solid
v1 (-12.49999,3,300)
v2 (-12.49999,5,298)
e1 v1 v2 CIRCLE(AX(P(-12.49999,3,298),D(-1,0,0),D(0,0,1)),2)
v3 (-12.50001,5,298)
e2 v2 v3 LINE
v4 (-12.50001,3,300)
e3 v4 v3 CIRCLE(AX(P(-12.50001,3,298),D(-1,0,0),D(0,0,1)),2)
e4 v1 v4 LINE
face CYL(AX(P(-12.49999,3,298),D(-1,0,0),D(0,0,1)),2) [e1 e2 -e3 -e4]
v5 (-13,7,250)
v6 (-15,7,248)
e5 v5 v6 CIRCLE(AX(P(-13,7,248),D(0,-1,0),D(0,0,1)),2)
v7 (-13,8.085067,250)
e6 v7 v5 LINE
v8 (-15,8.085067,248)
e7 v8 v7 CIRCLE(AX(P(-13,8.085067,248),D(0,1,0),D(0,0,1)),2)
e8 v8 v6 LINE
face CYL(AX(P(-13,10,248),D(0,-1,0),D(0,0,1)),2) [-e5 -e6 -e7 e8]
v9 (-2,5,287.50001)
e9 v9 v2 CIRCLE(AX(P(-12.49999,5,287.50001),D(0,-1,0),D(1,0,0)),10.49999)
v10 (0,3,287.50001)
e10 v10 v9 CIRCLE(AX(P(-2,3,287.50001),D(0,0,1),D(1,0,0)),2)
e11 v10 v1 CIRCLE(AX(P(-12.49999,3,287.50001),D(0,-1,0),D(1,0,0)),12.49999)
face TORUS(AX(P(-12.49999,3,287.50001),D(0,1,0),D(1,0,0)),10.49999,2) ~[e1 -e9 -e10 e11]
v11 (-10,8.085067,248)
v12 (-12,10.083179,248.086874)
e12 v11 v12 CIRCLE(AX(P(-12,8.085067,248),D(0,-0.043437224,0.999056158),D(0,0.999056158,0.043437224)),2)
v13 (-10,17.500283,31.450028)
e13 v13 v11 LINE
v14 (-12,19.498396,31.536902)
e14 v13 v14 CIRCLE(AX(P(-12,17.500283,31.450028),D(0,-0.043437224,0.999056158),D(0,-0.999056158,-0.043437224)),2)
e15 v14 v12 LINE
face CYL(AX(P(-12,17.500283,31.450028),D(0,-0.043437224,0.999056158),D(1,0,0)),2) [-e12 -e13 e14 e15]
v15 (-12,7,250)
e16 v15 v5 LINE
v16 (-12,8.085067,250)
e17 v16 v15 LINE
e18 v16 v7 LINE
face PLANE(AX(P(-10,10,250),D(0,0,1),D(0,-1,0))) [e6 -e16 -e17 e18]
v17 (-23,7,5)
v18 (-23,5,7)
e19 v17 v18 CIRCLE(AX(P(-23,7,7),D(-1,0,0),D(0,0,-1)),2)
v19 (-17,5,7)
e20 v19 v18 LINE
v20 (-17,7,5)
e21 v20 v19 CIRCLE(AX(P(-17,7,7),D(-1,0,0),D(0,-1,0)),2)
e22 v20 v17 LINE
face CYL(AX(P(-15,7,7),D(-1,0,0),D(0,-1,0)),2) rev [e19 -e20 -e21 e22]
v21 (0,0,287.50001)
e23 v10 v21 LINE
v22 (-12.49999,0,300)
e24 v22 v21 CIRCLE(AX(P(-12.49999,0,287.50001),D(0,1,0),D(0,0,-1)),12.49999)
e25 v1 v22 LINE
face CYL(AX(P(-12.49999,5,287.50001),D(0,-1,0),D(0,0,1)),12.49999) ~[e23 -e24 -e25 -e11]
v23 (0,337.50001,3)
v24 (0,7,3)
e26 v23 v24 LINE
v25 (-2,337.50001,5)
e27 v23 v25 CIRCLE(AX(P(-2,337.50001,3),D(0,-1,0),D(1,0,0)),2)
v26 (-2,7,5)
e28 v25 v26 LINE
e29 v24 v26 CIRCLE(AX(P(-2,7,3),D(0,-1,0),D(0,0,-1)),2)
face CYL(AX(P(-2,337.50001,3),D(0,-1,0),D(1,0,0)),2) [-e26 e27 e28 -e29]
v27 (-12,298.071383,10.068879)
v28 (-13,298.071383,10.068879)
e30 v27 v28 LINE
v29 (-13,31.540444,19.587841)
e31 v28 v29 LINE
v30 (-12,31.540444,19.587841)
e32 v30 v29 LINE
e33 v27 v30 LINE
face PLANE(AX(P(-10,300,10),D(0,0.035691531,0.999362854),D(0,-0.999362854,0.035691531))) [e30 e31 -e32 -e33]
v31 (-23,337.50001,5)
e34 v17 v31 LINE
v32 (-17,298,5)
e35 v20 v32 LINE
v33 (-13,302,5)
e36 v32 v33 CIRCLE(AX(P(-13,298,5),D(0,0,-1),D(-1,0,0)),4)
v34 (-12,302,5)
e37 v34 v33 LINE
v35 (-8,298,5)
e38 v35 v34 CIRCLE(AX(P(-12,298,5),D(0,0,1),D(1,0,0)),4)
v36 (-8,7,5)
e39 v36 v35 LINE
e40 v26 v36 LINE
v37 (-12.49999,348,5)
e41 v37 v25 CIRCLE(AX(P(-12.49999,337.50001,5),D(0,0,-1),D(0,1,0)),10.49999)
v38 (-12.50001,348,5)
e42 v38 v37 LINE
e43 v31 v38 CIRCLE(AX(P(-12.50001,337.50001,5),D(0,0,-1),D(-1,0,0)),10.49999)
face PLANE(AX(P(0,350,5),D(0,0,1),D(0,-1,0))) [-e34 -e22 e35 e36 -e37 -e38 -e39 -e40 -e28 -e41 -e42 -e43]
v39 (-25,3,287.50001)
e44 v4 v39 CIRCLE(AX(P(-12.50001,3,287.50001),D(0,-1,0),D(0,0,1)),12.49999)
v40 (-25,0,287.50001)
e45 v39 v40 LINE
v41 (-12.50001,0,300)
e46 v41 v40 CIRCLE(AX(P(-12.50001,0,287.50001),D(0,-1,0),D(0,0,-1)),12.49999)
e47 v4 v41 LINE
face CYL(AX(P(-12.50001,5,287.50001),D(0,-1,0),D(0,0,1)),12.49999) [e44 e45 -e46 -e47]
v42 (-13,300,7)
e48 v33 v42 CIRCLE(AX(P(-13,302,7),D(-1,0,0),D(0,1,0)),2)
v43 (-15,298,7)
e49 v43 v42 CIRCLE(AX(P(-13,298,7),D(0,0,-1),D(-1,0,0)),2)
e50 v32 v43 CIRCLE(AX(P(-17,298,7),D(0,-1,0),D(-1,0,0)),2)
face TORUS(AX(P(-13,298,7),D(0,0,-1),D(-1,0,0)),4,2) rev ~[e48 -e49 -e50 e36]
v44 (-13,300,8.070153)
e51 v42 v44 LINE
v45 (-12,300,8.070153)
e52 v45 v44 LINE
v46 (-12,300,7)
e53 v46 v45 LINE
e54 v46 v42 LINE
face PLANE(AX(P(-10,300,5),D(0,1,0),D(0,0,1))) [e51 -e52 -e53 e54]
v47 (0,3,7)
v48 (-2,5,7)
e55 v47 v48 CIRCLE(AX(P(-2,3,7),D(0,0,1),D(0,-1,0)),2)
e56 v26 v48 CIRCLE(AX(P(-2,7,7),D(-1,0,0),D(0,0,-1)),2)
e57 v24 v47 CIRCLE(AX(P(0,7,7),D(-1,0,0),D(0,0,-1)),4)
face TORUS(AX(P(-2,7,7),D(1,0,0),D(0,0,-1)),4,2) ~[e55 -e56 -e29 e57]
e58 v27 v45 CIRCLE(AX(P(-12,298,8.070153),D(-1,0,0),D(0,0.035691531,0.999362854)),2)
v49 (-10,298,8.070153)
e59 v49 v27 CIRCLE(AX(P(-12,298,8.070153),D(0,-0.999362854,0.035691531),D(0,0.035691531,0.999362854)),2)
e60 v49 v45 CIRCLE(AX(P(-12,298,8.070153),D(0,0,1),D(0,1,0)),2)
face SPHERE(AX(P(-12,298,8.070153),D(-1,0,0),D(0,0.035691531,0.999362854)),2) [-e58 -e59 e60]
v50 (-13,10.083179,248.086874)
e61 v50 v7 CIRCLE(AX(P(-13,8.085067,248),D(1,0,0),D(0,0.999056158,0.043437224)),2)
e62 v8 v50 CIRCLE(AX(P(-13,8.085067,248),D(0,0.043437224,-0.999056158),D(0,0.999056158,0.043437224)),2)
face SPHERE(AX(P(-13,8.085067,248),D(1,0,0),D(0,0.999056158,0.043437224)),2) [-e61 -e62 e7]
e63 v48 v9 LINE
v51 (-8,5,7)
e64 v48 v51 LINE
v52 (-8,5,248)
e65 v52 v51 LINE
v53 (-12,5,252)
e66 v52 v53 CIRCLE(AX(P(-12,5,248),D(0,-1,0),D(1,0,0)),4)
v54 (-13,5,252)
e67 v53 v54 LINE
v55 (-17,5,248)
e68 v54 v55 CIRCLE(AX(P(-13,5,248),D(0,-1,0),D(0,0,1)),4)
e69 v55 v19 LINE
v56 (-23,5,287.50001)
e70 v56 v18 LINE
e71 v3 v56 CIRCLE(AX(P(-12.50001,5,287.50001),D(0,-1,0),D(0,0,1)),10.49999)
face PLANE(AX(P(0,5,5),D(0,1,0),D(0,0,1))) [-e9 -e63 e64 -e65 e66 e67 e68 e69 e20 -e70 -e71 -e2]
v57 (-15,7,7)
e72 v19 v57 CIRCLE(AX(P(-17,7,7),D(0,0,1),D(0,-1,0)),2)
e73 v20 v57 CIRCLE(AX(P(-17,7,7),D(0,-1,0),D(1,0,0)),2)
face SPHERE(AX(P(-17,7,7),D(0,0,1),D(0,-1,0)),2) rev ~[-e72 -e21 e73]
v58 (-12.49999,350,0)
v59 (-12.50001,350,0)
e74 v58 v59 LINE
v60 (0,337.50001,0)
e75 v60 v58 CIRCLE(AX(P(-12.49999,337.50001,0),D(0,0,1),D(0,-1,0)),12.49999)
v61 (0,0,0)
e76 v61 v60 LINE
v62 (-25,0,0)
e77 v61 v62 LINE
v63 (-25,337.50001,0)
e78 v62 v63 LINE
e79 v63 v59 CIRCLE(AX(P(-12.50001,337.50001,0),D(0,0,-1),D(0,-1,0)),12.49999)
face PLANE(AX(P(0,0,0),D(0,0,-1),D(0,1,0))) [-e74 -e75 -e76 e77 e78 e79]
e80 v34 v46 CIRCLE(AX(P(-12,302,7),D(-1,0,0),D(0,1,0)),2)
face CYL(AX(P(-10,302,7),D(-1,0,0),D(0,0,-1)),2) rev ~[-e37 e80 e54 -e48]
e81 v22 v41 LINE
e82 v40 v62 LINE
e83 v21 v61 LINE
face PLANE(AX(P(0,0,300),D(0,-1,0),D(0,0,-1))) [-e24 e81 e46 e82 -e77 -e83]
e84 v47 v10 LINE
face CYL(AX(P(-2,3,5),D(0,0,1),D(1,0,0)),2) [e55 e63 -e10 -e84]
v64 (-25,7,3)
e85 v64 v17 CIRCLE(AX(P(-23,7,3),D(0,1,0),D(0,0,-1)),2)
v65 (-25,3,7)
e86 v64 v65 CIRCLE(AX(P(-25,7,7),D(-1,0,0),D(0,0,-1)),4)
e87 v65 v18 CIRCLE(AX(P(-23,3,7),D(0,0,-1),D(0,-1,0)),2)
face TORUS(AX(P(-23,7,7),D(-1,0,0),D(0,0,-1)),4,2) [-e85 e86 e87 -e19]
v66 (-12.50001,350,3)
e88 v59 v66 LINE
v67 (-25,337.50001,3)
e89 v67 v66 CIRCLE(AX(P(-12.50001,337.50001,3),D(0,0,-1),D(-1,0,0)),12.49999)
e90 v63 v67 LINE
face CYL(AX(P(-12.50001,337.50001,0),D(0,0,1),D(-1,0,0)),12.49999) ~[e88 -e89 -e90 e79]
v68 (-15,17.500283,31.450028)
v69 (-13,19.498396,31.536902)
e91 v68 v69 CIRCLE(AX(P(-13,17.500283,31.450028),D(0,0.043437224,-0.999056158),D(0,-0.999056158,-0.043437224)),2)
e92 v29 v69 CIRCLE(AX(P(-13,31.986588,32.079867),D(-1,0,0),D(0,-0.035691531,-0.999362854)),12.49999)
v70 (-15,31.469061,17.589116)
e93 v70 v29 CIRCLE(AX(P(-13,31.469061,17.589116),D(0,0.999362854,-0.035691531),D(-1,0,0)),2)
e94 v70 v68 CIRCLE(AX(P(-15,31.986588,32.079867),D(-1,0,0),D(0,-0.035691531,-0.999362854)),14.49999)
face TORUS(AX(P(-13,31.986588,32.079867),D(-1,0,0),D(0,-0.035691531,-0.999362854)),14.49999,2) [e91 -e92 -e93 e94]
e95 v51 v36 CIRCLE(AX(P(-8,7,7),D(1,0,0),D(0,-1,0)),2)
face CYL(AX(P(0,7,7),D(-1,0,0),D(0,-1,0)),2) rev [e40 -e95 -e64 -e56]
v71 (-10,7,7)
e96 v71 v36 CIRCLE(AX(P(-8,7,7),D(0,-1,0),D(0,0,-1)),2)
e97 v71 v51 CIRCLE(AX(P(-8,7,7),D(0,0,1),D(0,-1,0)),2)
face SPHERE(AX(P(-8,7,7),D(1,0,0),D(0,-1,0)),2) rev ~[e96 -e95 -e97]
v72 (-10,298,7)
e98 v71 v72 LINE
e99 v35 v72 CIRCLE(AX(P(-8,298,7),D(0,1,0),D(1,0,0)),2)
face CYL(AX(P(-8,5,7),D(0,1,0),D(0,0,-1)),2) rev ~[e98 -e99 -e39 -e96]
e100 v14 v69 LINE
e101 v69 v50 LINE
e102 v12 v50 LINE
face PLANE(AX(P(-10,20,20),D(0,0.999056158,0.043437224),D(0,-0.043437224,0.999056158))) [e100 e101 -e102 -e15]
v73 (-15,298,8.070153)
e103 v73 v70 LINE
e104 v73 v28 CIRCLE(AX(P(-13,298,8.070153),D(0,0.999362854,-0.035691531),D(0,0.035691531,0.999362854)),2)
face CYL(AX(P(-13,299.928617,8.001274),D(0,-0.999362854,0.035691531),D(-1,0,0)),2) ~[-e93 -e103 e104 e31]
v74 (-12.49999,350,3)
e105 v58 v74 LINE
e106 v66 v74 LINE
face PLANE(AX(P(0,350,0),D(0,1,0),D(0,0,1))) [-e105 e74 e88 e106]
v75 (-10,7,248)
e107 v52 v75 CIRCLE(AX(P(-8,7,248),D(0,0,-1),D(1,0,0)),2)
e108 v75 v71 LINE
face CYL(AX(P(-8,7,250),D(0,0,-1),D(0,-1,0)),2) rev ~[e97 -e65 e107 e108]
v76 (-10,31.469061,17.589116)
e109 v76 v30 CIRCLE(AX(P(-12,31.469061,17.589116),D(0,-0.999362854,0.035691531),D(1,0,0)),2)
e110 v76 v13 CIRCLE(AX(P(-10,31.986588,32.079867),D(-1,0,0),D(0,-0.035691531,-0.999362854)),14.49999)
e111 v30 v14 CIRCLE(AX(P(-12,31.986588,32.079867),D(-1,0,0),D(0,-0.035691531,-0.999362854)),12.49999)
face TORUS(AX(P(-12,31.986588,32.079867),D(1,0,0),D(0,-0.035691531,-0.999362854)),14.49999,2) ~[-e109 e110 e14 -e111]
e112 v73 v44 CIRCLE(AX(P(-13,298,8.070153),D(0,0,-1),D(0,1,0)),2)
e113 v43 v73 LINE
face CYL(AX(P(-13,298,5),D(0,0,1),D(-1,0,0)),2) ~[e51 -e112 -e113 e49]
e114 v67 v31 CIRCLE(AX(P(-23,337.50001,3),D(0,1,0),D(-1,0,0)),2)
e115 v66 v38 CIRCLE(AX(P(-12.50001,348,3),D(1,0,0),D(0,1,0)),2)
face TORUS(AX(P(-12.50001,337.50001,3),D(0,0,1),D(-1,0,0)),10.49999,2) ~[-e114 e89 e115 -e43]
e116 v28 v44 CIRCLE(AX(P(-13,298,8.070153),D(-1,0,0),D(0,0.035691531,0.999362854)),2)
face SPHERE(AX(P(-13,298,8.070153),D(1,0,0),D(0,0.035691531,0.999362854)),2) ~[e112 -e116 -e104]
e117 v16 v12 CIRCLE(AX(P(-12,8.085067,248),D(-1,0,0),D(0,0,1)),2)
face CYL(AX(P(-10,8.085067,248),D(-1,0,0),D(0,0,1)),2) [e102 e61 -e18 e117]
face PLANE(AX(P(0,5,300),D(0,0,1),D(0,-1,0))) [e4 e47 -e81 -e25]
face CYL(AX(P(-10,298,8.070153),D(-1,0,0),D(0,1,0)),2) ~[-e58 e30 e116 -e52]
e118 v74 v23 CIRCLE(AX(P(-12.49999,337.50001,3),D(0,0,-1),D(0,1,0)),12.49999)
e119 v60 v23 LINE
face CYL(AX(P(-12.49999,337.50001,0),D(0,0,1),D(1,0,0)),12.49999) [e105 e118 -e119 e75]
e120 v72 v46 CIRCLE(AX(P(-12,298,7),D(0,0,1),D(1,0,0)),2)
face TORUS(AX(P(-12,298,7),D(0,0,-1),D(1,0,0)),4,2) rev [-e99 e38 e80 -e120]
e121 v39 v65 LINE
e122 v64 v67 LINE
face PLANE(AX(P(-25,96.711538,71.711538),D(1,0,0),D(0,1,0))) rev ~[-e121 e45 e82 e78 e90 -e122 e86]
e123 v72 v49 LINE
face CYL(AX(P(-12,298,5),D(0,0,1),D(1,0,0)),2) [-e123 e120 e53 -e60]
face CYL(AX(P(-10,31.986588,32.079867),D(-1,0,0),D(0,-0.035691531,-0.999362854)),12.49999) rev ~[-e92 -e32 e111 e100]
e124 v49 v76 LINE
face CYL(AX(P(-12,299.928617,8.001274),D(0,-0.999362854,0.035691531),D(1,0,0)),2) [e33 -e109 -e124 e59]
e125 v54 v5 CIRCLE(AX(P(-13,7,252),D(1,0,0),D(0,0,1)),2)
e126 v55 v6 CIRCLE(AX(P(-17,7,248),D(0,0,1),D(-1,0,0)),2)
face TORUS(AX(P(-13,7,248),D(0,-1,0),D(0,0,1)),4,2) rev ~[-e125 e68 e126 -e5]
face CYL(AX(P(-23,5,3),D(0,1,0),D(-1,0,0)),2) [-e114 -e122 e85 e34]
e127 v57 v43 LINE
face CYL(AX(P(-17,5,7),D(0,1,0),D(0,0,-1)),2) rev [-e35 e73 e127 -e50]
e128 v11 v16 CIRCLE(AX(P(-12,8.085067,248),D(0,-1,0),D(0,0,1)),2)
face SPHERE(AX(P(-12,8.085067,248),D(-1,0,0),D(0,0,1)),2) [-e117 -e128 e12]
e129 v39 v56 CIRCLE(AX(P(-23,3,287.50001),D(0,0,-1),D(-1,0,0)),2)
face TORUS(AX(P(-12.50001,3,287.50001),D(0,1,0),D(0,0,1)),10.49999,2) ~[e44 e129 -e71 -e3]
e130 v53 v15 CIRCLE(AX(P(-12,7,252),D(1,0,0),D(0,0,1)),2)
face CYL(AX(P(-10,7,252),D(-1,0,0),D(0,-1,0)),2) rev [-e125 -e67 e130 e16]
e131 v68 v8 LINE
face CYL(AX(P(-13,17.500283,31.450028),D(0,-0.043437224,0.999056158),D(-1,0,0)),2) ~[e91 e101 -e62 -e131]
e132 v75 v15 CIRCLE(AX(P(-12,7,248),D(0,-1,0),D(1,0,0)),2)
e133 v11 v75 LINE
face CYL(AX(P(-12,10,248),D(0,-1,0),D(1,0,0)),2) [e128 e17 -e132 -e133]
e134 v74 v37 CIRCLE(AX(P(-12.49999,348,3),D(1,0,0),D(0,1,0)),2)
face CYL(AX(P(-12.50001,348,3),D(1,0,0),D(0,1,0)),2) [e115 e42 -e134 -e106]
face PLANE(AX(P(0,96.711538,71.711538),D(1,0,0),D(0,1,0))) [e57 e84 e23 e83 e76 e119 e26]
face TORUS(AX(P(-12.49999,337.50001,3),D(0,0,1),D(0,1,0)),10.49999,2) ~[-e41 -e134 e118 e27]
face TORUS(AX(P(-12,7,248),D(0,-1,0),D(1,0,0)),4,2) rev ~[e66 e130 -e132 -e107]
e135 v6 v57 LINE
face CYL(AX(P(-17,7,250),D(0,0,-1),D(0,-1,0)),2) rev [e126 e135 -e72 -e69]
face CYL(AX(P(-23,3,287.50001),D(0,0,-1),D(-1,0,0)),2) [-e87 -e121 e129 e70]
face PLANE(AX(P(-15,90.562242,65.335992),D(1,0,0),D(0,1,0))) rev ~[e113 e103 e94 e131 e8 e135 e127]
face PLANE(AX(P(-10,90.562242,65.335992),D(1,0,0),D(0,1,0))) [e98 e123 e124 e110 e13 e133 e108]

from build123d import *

# Parameters (mm, degrees)
F1_DEPTH = 25
F4_DEPTH = 5
F5_R     = 12.49999
F6_R     = 2


# Not quite as in the source:
# - a fillet or chamfer is up to 0.001 mm smaller than in the source, because OpenCascade refuses the exact size


with BuildPart() as f1:
    # F0 (on Right) → F1 (new body)
    with BuildSketch(Plane.YZ):
        Polygon((0, 300), (0, 0), (350, 0), (350, 5), (5, 5), (5, 300), align=None)
    extrude(amount=-F1_DEPTH)

    # F3 (on offset) → F4 (join)
    with BuildSketch(Plane.YZ.offset(-10)):
        Polygon((10, 250), (5, 250), (5, 5), (300, 5), (300, 10), (20, 20), align=None)
    extrude(amount=-F4_DEPTH)

    # F5 (radius 12.5 in the source; OpenCascade refuses exactly that, so slightly less here)
    f5_edges = [f1.edges().sort_by_distance(p)[0] for p in [
        (0, 2.5, 300),
        (-25, 2.5, 300),
        (-25, 350, 2.5),
        (0, 350, 2.5),
        (-12.5, 20, 20),
    ]]
    fillet(f5_edges, radius=F5_R)

    # F6
    f6_edges = [f1.edges().sort_by_distance(p)[0] for p in [
        (0, 5, 146.250005),
        (-3.661162, 5, 296.338838),
        (-5, 5, 5),
        (-12.5, 5, 300),
        (-10, 5, 127.5),
        (-21.338838, 5, 296.338838),
        (-12.5, 5, 250),
        (-25, 5, 146.250005),
        (-15, 5, 127.5),
        (-20, 5, 5),
        (-10, 14.749198, 140.768451),
        (-12.5, 19.498396, 31.536902),
        (-12.5, 10, 250),
        (-15, 14.749198, 140.768451),
        (-15, 165.770222, 14.793921),
        (-15, 23.182084, 23.206847),
        (-15, 300, 7.5),
        (-15, 152.5, 5),
        (-15, 7.5, 250),
        (-10, 165.770222, 14.793921),
        (-10, 23.182084, 23.206847),
        (-10, 300, 7.5),
        (-10, 152.5, 5),
        (-10, 7.5, 250),
        (0, 171.250005, 5),
        (-3.661162, 346.338838, 5),
        (-12.5, 350, 5),
        (-21.338838, 346.338838, 5),
        (-12.5, 300, 5),
        (-25, 171.250005, 5),
        (-12.5, 300, 10),
    ]]
    fillet(f6_edges, radius=F6_R)


solid = f1.part
